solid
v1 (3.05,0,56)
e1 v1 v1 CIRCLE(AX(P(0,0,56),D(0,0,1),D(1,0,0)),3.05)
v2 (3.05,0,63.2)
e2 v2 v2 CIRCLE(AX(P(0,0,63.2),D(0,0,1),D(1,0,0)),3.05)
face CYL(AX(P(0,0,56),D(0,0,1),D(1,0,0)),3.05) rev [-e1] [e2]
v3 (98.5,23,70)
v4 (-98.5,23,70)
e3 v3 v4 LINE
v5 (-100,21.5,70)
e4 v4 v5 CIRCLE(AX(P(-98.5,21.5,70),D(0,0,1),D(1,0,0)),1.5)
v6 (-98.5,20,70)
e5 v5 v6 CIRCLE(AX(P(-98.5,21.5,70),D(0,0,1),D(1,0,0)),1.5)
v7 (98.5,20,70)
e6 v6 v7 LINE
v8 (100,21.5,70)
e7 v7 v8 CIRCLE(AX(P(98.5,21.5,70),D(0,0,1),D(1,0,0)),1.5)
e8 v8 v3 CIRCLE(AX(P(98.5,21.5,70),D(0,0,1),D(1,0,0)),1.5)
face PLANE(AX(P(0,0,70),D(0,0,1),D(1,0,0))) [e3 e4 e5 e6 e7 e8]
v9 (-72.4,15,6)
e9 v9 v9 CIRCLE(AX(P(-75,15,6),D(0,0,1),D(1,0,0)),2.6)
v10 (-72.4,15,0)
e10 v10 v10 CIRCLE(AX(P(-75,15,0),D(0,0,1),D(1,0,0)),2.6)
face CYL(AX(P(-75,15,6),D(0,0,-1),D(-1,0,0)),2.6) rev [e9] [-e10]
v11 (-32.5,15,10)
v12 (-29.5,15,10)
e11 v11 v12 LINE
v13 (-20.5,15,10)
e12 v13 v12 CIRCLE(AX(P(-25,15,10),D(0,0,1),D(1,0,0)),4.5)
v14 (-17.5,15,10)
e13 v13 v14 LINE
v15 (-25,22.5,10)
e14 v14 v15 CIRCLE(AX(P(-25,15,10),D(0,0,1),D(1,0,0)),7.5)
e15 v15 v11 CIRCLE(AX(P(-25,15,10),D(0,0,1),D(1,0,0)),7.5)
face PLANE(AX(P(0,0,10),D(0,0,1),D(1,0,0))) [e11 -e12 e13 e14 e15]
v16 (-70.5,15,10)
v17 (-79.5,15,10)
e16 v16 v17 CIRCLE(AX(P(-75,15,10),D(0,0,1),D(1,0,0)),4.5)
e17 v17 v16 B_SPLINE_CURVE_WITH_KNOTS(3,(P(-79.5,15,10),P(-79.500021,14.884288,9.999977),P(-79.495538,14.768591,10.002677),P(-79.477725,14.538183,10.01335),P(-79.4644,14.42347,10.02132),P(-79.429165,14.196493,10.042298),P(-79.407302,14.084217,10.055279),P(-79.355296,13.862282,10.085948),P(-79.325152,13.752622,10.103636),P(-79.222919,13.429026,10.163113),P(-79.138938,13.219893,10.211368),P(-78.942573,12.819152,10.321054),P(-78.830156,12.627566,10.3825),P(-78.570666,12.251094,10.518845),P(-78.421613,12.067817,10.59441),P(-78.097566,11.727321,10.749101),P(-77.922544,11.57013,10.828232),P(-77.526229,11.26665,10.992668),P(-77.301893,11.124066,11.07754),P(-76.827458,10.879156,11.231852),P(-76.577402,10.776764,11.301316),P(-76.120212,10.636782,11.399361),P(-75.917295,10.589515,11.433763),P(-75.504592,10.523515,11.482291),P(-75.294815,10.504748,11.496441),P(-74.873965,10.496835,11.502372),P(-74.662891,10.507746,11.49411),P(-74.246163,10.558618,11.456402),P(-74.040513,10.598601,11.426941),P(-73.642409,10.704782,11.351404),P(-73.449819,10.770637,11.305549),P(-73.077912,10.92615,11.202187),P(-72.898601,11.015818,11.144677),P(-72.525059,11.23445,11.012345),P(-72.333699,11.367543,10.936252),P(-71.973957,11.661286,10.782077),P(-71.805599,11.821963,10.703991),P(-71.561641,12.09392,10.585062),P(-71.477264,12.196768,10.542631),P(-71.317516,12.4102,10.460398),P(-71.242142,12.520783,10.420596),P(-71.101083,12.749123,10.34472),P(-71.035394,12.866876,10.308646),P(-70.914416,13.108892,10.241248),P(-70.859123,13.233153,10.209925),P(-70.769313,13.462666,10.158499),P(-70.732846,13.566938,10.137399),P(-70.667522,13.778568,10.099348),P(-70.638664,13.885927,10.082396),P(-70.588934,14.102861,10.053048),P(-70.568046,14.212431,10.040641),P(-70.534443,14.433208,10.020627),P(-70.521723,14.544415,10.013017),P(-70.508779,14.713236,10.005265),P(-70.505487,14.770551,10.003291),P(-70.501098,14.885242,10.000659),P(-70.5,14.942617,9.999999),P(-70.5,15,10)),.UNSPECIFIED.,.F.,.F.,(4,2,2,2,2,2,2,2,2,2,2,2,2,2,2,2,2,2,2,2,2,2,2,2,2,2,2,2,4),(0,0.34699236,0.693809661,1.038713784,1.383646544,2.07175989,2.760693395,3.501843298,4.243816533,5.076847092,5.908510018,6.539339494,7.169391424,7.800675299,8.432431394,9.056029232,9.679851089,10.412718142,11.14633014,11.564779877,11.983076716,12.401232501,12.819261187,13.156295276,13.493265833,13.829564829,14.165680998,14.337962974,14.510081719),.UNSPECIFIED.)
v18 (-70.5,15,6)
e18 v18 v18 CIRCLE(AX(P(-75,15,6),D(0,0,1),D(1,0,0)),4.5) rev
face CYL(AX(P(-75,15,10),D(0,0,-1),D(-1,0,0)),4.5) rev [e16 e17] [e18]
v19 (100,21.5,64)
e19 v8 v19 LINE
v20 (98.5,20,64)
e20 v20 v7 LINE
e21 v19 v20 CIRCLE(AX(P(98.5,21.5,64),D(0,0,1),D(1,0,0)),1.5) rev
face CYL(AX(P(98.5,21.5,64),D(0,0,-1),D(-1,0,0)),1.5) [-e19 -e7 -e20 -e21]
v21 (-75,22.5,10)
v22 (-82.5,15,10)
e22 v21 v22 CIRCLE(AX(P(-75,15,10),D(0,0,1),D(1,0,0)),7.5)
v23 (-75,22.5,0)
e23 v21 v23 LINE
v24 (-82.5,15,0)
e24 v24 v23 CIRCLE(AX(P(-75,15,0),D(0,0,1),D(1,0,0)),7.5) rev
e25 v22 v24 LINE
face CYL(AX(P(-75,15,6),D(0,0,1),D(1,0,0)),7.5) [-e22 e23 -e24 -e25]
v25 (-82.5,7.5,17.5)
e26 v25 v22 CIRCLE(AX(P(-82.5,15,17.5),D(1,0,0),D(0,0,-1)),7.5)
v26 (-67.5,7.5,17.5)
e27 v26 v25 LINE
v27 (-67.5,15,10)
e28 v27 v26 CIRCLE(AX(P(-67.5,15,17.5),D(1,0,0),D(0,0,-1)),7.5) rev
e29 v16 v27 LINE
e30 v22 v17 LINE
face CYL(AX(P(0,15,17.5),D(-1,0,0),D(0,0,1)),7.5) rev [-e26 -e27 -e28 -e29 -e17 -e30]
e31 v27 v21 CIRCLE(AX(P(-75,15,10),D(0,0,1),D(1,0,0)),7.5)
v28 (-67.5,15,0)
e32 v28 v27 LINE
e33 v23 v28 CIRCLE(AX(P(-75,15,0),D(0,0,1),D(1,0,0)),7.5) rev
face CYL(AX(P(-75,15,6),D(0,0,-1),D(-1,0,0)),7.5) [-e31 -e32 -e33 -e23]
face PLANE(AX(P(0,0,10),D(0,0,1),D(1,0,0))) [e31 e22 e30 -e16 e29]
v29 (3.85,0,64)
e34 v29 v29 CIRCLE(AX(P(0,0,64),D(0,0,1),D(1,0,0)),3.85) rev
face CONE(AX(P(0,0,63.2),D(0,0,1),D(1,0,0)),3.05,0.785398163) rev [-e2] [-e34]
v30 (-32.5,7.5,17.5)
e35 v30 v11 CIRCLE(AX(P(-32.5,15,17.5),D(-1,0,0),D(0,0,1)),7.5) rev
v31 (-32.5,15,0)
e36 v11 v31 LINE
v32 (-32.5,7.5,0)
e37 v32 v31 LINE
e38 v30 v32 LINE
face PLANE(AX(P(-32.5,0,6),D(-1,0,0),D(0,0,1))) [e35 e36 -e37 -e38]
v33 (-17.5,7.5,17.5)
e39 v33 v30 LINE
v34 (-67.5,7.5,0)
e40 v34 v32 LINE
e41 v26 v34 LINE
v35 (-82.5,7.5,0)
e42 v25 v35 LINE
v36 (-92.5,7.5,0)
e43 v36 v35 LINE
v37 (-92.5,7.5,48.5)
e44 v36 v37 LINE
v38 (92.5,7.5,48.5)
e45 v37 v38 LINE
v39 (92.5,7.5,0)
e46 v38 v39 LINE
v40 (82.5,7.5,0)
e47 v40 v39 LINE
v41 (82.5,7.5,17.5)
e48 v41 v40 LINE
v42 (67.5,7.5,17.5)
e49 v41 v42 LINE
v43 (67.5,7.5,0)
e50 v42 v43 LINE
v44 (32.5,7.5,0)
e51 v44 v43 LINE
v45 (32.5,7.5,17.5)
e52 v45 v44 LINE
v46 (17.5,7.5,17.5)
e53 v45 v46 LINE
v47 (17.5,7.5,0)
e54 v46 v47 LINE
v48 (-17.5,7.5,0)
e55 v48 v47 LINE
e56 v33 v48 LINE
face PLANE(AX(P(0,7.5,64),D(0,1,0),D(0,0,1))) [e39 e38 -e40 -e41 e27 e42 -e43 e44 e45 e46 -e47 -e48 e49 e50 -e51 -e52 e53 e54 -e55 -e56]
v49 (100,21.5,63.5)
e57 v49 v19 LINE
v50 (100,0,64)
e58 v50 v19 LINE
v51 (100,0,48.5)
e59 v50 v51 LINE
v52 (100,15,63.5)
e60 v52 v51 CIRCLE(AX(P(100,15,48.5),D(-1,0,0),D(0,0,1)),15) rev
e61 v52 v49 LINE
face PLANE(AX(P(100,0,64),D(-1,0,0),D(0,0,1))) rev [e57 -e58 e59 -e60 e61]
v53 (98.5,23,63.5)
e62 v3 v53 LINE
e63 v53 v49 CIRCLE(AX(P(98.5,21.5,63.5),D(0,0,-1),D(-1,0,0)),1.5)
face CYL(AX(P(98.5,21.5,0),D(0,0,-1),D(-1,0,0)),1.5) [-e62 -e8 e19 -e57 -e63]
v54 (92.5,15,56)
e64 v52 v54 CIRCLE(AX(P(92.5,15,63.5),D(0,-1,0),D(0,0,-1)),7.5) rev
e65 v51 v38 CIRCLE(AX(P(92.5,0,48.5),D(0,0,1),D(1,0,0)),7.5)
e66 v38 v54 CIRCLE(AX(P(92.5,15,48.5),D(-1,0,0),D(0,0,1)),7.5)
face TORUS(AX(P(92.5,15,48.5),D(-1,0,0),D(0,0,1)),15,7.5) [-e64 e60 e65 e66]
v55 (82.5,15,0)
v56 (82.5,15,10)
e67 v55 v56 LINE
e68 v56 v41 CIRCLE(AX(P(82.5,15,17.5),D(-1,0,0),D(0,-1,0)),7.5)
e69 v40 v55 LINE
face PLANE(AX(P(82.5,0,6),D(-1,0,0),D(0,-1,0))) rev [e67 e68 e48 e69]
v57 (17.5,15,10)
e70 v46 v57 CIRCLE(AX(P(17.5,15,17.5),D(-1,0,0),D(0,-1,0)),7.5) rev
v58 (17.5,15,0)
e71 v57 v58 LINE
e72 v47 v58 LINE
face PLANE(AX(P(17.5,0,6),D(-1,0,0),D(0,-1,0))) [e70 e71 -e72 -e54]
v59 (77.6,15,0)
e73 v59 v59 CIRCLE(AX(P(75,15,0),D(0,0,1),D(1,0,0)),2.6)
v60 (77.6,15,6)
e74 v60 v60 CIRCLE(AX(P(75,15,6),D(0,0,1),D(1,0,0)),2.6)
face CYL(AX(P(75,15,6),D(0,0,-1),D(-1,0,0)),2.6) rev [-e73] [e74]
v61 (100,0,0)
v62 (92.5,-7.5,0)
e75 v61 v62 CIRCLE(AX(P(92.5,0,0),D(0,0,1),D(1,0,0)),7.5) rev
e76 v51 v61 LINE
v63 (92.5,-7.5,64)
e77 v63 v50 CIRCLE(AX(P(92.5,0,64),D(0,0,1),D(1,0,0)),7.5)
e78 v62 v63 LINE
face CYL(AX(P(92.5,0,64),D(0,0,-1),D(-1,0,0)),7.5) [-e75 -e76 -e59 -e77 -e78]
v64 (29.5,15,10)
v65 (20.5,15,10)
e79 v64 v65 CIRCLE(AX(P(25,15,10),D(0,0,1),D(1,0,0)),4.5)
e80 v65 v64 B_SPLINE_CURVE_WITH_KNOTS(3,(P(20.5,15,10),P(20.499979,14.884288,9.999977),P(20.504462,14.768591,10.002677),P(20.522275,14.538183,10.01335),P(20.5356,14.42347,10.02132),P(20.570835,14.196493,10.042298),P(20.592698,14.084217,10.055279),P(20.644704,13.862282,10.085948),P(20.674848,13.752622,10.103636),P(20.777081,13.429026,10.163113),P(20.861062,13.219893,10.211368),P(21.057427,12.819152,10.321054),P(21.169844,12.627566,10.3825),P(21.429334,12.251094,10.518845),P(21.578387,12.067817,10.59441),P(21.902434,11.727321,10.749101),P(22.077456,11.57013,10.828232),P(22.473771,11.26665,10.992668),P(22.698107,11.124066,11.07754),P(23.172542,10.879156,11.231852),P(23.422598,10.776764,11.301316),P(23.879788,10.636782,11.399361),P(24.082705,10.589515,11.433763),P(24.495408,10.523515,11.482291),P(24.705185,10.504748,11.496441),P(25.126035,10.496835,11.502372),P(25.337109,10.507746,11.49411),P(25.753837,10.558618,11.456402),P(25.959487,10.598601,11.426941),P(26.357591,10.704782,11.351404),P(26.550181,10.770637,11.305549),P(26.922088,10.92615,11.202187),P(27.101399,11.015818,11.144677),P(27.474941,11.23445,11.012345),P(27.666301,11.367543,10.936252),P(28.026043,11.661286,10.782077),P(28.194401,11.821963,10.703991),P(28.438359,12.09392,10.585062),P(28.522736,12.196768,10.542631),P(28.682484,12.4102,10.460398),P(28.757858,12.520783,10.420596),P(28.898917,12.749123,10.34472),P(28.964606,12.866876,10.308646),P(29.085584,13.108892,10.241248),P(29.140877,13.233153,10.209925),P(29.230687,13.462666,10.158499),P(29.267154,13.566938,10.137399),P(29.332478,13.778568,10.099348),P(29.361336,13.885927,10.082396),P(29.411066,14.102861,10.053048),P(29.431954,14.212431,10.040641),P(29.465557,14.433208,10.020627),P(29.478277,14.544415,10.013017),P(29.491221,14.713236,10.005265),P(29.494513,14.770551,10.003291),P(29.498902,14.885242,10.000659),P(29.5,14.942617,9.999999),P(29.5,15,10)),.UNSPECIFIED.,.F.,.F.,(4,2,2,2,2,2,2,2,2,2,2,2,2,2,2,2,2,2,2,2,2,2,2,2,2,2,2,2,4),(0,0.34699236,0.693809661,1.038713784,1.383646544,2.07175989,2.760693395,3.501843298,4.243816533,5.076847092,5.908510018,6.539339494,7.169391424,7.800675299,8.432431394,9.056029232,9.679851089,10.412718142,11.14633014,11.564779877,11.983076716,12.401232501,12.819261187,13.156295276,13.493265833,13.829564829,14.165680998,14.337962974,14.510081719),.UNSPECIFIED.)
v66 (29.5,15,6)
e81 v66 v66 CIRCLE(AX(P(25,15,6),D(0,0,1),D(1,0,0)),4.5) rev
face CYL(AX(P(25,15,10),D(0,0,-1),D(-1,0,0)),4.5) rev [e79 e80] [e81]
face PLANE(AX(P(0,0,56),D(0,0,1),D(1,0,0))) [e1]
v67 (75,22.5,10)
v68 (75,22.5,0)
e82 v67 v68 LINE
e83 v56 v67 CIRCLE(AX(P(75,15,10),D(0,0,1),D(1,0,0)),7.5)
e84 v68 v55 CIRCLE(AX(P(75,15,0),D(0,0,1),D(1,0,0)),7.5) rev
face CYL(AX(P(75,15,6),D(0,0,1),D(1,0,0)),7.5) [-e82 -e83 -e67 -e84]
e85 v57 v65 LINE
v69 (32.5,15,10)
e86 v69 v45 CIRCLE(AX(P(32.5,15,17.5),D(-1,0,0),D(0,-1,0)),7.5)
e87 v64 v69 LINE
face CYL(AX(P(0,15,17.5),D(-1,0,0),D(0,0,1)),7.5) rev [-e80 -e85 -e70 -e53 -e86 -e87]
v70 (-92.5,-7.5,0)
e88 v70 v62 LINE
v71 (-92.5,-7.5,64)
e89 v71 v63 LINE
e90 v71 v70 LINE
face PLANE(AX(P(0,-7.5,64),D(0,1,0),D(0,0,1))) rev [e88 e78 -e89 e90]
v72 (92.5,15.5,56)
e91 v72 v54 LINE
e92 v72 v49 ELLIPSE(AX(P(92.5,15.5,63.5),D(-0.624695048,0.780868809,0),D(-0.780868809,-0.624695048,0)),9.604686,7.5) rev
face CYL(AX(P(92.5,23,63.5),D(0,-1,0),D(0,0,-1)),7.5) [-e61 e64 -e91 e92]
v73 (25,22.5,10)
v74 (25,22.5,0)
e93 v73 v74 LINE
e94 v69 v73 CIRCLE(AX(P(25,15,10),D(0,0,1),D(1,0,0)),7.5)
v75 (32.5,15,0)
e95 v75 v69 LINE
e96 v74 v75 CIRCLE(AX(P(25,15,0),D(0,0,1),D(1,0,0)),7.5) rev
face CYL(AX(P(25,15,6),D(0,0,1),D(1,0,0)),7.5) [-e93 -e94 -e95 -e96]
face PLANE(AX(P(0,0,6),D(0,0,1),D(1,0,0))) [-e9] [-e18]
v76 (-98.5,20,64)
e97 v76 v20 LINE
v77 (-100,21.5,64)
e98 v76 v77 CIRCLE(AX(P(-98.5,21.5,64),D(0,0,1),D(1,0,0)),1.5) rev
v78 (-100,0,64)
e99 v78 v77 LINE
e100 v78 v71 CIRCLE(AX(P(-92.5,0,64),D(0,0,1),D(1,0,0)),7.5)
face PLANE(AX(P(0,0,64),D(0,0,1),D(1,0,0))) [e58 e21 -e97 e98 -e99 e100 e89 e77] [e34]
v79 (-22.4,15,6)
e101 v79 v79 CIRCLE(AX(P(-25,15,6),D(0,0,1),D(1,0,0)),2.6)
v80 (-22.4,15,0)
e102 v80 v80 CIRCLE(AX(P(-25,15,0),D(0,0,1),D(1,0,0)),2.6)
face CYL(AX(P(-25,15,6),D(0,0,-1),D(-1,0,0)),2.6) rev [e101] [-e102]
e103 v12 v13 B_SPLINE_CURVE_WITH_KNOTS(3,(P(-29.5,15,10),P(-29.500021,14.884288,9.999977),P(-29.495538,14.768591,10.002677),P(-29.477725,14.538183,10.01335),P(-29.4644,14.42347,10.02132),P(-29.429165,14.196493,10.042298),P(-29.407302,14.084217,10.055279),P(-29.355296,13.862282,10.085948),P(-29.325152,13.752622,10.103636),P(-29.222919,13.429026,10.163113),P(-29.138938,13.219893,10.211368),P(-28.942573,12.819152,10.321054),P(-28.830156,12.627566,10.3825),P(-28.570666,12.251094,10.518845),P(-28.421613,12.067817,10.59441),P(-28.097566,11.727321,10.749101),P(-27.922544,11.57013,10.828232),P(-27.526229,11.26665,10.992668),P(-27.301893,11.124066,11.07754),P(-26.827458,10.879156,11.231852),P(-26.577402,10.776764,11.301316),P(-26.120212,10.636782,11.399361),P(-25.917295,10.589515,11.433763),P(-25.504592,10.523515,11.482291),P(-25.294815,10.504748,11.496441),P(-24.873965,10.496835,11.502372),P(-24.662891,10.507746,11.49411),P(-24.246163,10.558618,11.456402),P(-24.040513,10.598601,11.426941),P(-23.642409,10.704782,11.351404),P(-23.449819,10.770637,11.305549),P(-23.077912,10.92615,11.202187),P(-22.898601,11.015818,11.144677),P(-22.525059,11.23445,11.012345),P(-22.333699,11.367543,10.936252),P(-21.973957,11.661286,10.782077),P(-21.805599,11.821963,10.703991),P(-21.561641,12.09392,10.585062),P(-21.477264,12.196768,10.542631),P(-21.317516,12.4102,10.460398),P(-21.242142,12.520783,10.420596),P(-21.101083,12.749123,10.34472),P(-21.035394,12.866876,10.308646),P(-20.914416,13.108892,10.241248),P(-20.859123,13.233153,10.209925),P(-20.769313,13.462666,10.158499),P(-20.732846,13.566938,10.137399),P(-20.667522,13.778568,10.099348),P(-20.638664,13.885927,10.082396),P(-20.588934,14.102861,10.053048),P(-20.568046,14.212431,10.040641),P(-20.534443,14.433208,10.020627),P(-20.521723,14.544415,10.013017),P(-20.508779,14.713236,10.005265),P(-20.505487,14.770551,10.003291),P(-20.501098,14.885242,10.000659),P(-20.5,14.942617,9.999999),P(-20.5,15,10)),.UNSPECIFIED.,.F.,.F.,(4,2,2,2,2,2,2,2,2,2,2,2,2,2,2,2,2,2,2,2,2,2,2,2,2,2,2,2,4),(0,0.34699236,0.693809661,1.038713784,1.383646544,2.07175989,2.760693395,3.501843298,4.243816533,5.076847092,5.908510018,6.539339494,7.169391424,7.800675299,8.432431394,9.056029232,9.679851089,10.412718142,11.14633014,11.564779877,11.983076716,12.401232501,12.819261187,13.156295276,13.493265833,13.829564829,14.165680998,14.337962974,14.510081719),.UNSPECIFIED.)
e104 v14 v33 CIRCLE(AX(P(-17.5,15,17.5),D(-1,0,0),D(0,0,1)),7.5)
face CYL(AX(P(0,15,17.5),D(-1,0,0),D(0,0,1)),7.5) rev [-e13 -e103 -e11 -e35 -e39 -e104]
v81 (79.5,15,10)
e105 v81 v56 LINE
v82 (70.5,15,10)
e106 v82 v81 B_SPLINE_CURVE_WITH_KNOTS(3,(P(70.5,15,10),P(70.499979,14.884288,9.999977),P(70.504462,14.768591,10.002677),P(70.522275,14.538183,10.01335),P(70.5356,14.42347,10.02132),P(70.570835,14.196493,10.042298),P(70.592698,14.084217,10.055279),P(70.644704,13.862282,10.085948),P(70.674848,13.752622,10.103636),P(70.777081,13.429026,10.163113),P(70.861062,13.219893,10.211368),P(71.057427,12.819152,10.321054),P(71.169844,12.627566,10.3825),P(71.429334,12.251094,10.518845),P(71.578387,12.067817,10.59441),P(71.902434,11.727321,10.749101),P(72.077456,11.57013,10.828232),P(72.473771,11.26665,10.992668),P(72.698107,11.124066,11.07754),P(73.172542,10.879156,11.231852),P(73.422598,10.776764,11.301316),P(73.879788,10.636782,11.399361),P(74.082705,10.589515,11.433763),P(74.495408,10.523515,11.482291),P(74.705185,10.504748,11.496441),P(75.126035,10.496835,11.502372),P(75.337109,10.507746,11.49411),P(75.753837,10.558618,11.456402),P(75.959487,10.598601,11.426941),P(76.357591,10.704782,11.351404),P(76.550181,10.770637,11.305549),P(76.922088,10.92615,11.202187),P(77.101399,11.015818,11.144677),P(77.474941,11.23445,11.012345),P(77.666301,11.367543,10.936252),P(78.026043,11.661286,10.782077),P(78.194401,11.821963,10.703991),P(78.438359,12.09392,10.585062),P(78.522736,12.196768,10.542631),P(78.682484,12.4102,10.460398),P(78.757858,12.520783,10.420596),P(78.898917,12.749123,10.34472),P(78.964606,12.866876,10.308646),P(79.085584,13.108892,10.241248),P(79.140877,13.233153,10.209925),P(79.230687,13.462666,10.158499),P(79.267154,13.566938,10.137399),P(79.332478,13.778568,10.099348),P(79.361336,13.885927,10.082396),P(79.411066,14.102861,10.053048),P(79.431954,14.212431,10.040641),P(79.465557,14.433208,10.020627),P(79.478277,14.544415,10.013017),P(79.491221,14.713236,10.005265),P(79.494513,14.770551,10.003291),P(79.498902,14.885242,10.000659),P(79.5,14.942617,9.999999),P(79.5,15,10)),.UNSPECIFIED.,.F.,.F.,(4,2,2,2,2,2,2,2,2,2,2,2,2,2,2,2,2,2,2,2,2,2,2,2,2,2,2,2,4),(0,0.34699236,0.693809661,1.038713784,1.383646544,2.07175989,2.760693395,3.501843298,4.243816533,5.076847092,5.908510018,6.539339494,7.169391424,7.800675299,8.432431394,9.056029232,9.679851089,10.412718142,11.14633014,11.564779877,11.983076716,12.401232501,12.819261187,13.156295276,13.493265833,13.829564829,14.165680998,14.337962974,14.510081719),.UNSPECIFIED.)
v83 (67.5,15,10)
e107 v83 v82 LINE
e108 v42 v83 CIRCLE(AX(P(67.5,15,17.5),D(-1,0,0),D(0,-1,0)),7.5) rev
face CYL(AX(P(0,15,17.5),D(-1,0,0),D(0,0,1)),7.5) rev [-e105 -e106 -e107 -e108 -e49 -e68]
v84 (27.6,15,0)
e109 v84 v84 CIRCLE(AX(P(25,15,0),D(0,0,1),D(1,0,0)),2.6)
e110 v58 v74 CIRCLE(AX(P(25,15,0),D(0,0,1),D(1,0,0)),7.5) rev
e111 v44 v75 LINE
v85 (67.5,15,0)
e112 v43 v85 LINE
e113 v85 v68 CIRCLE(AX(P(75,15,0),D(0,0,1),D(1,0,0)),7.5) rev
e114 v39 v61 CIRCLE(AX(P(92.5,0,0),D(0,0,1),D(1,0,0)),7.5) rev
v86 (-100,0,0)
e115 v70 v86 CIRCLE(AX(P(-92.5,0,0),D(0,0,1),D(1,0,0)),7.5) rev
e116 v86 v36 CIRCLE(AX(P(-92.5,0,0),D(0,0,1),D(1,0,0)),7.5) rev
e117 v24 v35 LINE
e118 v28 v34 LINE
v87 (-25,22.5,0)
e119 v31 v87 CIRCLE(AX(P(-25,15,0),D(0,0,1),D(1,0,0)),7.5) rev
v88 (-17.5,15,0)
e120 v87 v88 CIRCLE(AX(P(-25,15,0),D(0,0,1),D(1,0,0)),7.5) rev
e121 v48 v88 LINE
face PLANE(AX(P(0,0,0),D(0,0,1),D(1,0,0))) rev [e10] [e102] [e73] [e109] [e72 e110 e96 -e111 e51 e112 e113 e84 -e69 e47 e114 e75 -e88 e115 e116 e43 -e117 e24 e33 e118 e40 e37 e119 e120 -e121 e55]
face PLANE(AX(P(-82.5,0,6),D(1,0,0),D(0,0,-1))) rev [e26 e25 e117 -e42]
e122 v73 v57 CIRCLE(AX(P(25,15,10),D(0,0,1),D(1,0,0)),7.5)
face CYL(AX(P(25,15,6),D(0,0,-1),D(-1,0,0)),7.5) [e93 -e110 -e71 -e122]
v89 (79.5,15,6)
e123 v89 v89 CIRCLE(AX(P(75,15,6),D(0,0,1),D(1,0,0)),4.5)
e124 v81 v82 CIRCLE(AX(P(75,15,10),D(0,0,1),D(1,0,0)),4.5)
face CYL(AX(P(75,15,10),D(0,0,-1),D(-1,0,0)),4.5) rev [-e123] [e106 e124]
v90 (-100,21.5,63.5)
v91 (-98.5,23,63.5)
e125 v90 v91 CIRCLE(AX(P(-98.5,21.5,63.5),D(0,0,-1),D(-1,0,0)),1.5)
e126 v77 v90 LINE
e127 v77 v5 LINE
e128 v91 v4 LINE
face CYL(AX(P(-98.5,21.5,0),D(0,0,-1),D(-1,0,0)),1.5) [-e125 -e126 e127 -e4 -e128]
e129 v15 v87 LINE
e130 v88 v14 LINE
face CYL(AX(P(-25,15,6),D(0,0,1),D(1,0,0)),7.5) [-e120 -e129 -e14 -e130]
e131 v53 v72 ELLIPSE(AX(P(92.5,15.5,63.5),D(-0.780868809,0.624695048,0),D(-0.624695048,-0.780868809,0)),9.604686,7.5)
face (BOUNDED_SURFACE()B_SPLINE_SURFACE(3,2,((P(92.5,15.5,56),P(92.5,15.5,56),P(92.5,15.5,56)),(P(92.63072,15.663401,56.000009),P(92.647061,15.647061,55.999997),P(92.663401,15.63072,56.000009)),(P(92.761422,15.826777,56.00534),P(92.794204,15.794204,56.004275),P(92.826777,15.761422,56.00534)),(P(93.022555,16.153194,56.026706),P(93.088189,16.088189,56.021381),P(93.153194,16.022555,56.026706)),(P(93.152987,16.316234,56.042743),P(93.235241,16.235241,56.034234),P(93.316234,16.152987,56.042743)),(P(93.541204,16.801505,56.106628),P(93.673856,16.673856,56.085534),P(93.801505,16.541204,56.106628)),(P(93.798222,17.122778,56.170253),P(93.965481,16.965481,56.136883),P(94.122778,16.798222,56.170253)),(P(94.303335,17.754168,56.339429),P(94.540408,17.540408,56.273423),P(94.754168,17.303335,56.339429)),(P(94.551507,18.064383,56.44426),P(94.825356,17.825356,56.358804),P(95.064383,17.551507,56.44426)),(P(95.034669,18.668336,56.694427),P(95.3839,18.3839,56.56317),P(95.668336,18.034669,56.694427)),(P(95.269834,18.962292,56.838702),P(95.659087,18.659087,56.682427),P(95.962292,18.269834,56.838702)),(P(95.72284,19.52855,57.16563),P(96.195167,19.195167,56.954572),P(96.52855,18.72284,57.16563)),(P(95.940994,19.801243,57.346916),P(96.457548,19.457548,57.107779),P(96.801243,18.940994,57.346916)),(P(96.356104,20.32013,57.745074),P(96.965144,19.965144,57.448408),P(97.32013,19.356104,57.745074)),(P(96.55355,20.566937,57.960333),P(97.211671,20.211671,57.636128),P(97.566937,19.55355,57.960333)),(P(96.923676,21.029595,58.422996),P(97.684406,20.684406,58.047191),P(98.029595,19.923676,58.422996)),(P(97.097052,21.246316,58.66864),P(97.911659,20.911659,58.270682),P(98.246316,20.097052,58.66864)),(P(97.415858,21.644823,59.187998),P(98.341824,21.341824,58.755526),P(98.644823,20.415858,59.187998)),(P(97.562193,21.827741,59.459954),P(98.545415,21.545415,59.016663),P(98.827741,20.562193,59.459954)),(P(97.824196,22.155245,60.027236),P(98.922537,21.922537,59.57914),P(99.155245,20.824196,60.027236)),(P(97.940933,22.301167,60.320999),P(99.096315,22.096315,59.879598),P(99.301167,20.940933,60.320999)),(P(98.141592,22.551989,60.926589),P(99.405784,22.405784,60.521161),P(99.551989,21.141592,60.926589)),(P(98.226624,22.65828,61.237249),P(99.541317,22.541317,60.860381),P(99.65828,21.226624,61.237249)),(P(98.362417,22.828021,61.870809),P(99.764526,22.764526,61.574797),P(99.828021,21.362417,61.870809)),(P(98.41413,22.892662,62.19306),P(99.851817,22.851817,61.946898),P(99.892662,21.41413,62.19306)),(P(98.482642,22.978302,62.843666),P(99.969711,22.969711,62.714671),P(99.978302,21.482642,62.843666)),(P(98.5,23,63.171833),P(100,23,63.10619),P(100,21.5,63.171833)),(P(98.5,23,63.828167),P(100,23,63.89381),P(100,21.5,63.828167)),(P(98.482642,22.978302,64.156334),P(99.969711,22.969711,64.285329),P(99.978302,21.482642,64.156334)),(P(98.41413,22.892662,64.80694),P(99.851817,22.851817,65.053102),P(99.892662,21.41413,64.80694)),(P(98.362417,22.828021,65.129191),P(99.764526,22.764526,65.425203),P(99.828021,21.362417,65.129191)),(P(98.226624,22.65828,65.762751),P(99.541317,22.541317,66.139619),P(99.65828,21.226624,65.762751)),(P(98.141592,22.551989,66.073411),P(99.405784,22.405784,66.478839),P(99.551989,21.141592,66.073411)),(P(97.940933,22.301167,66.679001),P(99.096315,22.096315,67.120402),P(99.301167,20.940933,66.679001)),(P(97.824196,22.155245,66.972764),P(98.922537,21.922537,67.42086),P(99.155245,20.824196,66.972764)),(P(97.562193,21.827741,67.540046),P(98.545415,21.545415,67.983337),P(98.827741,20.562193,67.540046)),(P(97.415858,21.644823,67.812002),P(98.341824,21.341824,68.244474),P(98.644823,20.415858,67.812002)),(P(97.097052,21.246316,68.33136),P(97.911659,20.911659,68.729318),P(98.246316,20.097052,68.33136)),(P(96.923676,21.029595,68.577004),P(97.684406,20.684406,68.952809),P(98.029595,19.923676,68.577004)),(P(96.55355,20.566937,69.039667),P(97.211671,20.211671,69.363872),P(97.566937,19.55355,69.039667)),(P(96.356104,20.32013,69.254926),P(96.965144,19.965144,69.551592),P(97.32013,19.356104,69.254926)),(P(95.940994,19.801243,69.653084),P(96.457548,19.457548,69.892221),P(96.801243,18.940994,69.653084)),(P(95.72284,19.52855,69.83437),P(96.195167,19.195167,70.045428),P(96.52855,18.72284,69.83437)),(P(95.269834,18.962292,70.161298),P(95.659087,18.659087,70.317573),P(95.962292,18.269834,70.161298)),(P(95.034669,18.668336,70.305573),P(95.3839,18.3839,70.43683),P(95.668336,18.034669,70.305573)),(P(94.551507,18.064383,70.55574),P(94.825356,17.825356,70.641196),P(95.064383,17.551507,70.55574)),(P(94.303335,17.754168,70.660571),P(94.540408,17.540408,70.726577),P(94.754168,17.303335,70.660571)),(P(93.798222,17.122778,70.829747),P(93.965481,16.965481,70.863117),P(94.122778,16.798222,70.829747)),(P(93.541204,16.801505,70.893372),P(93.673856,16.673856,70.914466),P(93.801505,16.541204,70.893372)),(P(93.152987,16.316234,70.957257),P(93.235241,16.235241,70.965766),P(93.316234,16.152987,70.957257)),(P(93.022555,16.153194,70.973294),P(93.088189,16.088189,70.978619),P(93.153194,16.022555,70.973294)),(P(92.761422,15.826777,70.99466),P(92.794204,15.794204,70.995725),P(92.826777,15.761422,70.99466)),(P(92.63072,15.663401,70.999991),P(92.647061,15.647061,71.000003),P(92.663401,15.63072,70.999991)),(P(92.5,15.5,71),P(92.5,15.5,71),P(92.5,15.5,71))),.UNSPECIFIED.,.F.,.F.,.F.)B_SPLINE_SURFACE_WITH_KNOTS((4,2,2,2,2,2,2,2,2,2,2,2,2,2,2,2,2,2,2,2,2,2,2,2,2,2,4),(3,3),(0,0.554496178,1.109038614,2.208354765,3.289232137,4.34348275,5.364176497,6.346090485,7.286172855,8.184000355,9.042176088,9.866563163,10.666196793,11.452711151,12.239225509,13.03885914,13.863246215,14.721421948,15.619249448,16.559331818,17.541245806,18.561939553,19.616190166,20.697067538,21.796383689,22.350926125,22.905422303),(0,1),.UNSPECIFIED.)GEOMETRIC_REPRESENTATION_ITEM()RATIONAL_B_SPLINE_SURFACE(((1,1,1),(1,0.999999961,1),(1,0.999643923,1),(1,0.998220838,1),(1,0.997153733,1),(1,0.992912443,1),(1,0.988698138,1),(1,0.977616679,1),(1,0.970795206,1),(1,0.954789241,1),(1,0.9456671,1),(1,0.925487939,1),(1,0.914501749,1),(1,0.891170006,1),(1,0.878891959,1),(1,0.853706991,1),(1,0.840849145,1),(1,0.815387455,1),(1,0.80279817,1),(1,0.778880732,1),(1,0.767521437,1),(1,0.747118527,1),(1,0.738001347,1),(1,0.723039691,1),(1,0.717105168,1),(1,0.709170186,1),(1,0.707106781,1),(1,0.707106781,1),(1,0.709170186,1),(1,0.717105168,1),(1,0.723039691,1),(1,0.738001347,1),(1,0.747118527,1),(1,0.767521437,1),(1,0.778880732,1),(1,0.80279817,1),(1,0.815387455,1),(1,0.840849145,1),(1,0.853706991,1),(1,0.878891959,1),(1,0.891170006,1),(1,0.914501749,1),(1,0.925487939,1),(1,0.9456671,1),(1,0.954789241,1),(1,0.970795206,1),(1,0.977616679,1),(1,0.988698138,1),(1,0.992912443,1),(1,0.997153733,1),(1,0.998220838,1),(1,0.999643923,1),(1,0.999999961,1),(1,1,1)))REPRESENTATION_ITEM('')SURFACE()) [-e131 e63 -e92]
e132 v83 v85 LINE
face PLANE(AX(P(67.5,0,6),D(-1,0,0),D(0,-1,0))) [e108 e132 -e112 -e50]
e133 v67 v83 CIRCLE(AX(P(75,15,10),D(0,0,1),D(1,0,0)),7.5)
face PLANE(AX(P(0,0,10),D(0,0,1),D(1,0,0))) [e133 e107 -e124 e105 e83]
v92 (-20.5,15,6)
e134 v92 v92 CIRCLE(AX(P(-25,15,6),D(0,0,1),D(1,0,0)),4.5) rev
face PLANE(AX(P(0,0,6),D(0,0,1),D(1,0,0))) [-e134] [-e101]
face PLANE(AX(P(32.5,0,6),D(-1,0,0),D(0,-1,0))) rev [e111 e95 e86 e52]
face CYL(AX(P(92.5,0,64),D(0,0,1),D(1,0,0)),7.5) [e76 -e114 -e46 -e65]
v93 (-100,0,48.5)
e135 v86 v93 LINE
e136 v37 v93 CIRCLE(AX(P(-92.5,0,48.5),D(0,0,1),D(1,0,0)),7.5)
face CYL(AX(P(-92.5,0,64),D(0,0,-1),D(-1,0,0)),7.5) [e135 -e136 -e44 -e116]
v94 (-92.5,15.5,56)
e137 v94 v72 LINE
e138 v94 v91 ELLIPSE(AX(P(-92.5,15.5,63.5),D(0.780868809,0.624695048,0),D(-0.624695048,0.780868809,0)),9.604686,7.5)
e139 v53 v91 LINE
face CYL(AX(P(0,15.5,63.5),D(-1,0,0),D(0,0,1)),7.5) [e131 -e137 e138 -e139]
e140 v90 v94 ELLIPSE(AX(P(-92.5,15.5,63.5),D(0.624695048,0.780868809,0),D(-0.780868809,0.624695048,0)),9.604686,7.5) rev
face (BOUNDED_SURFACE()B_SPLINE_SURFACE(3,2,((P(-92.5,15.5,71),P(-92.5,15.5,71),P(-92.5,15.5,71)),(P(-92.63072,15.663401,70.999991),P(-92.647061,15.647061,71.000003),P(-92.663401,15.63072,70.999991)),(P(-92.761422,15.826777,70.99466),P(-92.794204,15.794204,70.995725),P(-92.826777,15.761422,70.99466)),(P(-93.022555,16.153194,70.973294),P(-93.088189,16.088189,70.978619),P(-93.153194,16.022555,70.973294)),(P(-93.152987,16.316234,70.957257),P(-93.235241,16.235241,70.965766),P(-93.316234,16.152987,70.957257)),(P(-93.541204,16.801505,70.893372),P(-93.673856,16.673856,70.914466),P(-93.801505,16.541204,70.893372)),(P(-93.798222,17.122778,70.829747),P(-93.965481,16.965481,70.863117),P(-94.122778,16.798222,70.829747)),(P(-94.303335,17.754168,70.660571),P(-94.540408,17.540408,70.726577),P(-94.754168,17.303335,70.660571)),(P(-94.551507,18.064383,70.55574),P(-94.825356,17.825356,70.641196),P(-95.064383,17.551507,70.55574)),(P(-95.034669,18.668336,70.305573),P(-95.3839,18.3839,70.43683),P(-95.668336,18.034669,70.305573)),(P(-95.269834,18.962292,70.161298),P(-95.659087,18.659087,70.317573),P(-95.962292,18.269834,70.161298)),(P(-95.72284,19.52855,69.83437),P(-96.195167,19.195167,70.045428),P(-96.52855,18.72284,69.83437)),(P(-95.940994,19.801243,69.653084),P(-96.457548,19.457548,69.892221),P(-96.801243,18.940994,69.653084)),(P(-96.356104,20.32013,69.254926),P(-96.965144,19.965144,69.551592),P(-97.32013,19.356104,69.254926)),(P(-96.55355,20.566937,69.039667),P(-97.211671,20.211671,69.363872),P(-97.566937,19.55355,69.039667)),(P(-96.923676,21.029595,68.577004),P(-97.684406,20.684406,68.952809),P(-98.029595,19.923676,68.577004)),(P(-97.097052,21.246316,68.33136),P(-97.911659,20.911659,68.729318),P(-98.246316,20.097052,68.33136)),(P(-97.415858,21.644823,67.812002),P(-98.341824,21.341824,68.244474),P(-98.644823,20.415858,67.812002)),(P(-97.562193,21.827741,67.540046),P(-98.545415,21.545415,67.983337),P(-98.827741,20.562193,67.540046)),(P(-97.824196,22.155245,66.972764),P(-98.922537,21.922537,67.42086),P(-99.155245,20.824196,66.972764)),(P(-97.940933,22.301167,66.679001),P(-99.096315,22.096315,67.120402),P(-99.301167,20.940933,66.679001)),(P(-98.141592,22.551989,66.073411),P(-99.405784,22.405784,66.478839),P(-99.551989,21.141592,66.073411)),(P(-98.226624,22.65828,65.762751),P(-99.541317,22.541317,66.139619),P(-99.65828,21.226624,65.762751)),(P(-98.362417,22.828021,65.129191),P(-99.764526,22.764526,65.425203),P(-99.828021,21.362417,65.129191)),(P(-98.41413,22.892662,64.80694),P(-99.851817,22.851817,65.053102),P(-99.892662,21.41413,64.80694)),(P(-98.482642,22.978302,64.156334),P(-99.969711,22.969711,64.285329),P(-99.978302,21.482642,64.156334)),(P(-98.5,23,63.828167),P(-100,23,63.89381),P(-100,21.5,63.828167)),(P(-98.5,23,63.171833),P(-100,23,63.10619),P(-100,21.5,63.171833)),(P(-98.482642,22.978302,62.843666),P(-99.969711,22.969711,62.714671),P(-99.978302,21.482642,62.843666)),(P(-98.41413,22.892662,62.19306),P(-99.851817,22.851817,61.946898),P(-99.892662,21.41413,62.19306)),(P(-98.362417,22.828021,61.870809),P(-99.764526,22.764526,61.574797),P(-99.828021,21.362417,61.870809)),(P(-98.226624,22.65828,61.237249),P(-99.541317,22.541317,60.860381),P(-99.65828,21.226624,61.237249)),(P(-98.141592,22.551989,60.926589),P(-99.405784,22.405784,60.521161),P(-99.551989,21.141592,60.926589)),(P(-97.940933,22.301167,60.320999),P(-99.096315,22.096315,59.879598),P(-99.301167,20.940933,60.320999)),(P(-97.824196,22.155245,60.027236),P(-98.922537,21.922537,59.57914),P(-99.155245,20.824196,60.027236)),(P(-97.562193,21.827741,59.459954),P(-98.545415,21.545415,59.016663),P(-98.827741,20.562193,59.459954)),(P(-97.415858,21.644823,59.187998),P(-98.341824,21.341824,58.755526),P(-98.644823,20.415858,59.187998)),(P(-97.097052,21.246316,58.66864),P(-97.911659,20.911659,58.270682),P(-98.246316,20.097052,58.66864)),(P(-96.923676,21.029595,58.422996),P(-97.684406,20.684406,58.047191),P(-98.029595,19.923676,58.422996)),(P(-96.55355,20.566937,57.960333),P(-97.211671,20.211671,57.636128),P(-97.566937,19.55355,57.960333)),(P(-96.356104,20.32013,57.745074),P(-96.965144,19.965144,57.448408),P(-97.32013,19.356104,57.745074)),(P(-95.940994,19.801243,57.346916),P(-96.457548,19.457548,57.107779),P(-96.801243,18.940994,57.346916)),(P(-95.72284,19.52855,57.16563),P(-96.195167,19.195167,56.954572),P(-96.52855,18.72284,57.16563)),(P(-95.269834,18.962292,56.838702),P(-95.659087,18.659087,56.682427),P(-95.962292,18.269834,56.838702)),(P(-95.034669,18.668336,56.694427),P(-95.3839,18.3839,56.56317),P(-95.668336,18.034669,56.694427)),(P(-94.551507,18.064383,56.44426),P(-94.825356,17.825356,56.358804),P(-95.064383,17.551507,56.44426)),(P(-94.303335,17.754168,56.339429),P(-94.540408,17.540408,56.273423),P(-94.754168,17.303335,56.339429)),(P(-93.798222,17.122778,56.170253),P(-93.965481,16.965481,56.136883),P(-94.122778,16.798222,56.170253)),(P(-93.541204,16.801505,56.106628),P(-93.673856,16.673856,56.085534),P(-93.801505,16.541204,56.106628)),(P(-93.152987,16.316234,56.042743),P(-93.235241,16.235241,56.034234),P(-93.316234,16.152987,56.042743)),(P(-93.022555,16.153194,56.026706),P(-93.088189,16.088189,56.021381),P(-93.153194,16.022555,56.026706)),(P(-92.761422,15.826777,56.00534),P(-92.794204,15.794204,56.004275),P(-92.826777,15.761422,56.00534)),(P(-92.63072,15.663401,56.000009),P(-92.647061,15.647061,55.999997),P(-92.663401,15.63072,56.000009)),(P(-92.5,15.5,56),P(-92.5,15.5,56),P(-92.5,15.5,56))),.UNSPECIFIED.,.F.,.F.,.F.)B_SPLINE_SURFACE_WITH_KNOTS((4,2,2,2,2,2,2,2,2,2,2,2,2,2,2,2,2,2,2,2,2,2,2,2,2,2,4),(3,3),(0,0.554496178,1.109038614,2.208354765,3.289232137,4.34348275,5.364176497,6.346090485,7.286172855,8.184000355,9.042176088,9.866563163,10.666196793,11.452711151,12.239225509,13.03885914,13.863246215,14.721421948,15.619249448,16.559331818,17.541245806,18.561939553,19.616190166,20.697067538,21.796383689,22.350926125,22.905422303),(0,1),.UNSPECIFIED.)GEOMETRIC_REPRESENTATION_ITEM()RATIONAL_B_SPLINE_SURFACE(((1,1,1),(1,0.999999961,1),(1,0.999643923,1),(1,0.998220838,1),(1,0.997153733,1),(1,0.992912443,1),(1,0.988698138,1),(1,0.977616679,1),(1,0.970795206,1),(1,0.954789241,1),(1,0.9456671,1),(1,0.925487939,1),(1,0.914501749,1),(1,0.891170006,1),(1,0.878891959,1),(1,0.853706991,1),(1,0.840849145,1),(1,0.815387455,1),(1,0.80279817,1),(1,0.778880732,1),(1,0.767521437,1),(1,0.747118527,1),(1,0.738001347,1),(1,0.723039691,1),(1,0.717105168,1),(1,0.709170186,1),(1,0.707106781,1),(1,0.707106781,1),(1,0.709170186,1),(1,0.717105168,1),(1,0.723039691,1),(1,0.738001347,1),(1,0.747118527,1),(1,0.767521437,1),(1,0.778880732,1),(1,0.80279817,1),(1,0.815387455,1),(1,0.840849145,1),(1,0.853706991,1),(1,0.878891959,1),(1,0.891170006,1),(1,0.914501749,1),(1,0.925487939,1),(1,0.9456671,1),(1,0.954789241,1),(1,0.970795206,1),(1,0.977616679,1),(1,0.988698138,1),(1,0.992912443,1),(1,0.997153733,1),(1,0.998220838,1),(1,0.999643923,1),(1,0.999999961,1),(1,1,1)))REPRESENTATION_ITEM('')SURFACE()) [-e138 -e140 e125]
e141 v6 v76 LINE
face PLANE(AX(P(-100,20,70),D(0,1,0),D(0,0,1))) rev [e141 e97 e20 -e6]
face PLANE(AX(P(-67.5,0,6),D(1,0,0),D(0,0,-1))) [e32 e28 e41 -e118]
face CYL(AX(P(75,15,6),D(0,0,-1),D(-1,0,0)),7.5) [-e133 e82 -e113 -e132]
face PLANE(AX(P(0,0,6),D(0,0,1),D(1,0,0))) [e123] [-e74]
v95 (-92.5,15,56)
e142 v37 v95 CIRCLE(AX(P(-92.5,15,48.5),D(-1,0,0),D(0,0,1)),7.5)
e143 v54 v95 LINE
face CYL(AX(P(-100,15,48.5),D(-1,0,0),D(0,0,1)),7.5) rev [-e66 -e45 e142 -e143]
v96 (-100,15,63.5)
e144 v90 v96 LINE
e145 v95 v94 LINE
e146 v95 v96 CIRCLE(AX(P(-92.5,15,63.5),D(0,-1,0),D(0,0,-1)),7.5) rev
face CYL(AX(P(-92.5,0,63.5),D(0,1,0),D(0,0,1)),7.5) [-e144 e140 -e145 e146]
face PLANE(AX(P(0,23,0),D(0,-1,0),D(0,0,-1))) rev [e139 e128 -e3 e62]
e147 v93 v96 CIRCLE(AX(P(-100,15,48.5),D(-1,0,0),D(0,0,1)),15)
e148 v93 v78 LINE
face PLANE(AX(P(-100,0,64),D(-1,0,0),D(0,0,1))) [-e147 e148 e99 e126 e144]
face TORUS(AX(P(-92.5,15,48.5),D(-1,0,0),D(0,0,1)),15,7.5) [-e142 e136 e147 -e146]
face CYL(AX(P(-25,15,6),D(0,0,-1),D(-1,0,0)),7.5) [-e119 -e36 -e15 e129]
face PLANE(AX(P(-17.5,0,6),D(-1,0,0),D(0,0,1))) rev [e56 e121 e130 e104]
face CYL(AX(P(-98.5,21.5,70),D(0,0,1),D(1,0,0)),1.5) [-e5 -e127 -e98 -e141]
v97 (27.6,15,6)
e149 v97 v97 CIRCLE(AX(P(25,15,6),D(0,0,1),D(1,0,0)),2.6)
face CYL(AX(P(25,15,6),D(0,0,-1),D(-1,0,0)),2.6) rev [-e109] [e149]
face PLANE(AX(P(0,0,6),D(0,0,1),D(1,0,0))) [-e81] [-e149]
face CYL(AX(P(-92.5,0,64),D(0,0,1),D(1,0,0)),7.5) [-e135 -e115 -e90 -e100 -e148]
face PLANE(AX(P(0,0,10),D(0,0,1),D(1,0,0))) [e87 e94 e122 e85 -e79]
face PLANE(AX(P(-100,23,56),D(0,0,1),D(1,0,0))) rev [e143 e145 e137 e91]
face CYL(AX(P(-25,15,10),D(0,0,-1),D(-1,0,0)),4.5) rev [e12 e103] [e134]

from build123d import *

# Parameters (mm, degrees)
SKETCH1_W             = 15
SKETCH1_H             = 15
SKETCH1_R             = 2.6
BOSS_EXTRUDE1_DEPTH   = 6
BOSS_EXTRUDE1_2_DEPTH = 6
BOSS_EXTRUDE1_3_DEPTH = 6
BOSS_EXTRUDE1_4_DEPTH = 6
BOSS_EXTRUDE2_DEPTH   = 64
SKETCH2_R             = 3.05
CUT_EXTRUDE1_DEPTH    = 8
SKETCH3_W             = 15
SKETCH3_H             = 15
SKETCH3_R             = 4.5
BOSS_EXTRUDE3_DEPTH   = 4
CHAMFER1_SIZE         = 0.8
SKETCH4_W             = 200
SKETCH4_H             = 8
BOSS_EXTRUDE4_DEPTH   = 15.5
SKETCH5_W             = 200
SKETCH5_H             = 3
BOSS_EXTRUDE5_DEPTH   = 6
FILLET3_R             = 7.5
FILLET4_R             = 1.5


# Some blends are built 0.0001 mm under size
with BuildPart() as part:
    # Sketch1 → Boss-Extrude1 (new body)
    with BuildSketch(Plane.XY):
        with Locations((-25, 15)):
            Rectangle(SKETCH1_W, SKETCH1_H)
        with Locations((-25, 15)):
            Circle(SKETCH1_R, mode=Mode.SUBTRACT)
    extrude(amount=BOSS_EXTRUDE1_DEPTH)



with BuildPart() as body_2:
    # Sketch1 → Boss-Extrude1 2 (new body)
    with BuildSketch(Plane.XY):
        with Locations((25, 15)):
            Rectangle(SKETCH1_W, SKETCH1_H)
        with Locations((25, 15)):
            Circle(SKETCH1_R, mode=Mode.SUBTRACT)
    extrude(amount=BOSS_EXTRUDE1_2_DEPTH)


with BuildPart() as body_3:
    # Sketch1 → Boss-Extrude1 3 (new body)
    with BuildSketch(Plane.XY):
        with Locations((-75, 15)):
            Rectangle(SKETCH1_W, SKETCH1_H)
        with Locations((-75, 15)):
            Circle(SKETCH1_R, mode=Mode.SUBTRACT)
    extrude(amount=BOSS_EXTRUDE1_3_DEPTH)


with BuildPart() as body_4:
    # Sketch1 → Boss-Extrude1 4 (new body)
    with BuildSketch(Plane.XY):
        with Locations((75, 15)):
            Rectangle(SKETCH1_W, SKETCH1_H)
        with Locations((75, 15)):
            Circle(SKETCH1_R, mode=Mode.SUBTRACT)
    extrude(amount=BOSS_EXTRUDE1_4_DEPTH)


with BuildPart() as part_1:
    add(part.part)

    add(body_2.part)  # Boss-Extrude2 merges body 2

    add(body_3.part)  # Boss-Extrude2 merges body 3
    # Sketch1<4> → Boss-Extrude2 (add)
    with BuildSketch(Plane.XY):
        Polygon((-100, 7.5), (-100, -7.5), (100, -7.5), (100, 7.5), (82.5, 7.5), (67.5, 7.5), (32.5, 7.5), (17.5, 7.5), (-17.5, 7.5), (-32.5, 7.5), (-67.5, 7.5), (-82.5, 7.5), align=None)
    extrude(amount=BOSS_EXTRUDE2_DEPTH)

    # Sketch2 → Cut-Extrude1 (cut)
    with BuildSketch(Plane.XY.offset(64)):
        Circle(SKETCH2_R)
    extrude(amount=-CUT_EXTRUDE1_DEPTH, mode=Mode.SUBTRACT)


    add(body_4.part)  # Boss-Extrude3 merges body 4
    # Sketch3 → Boss-Extrude3 (add)
    # profile 1 of 4: a face of its own
    with BuildSketch(Plane.XY.offset(6)):
        with Locations((75, 15)):
            Rectangle(SKETCH3_W, SKETCH3_H)
        with Locations((75, 15)):
            Circle(SKETCH3_R, mode=Mode.SUBTRACT)
    # profile 2 of 4: a face of its own
    with BuildSketch(Plane.XY.offset(6)):
        with Locations((25, 15)):
            Rectangle(SKETCH3_W, SKETCH3_H)
        with Locations((25, 15)):
            Circle(SKETCH3_R, mode=Mode.SUBTRACT)
    # profile 3 of 4: a face of its own
    with BuildSketch(Plane.XY.offset(6)):
        with Locations((-25, 15)):
            Rectangle(SKETCH3_W, SKETCH3_H)
        with Locations((-25, 15)):
            Circle(SKETCH3_R, mode=Mode.SUBTRACT)
    # profile 4 of 4: a face of its own
    with BuildSketch(Plane.XY.offset(6)):
        with Locations((-75, 15)):
            Rectangle(SKETCH3_W, SKETCH3_H)
        with Locations((-75, 15)):
            Circle(SKETCH3_R, mode=Mode.SUBTRACT)
    extrude(amount=BOSS_EXTRUDE3_DEPTH)

    # Chamfer1
    chamfer1_edges = [part_1.edges().sort_by_distance(p)[0] for p in [
        (-3.05, 0, 64),
    ]]
    chamfer(chamfer1_edges, length=CHAMFER1_SIZE)

    # Sketch4 → Boss-Extrude4 (add)
    with BuildSketch(Plane(origin=(0, 7.5, 0), x_dir=(1, 0, 0), z_dir=(0, 1, 0))):
        with Locations((0, -60)):
            Rectangle(SKETCH4_W, SKETCH4_H)
    extrude(amount=BOSS_EXTRUDE4_DEPTH)

    # Sketch5 → Boss-Extrude5 (add)
    with BuildSketch(Plane.XY.offset(64)):
        with Locations((0, 21.5)):
            Rectangle(SKETCH5_W, SKETCH5_H)
    extrude(amount=BOSS_EXTRUDE5_DEPTH)

    # Fillet3
    # the kernel refuses this fillet: 7.5 mm, written as the material it adds along each edge
    with BuildSketch(Plane(origin=(-82.5, 7.5, 10), x_dir=(0, 1, 0), z_dir=(1, 0, 0))) as fillet3_piece_1_section:
        with BuildLine():
            CenterArc((FILLET3_R, FILLET3_R), FILLET3_R, 180, 90)
            Line((0, FILLET3_R), (0, 0))
            Line((0, 0), (FILLET3_R, 0))
        make_face()
    fillet3_piece_1 = extrude(amount=15, mode=Mode.PRIVATE)
    fillet3_piece_1 = fillet3_piece_1 - Plane(origin=(-75, 15, 10), x_dir=(1, 0, 0), z_dir=(0, 0, -1)) * Cylinder(4.5, 60, mode=Mode.PRIVATE)
    add(fillet3_piece_1)
    with BuildSketch(Plane(origin=(-32.5, 7.5, 10), x_dir=(0, 1, 0), z_dir=(1, 0, 0))) as fillet3_piece_2_section:
        with BuildLine():
            CenterArc((FILLET3_R, FILLET3_R), FILLET3_R, 180, 90)
            Line((0, FILLET3_R), (0, 0))
            Line((0, 0), (FILLET3_R, 0))
        make_face()
    fillet3_piece_2 = extrude(amount=15, mode=Mode.PRIVATE)
    fillet3_piece_2 = fillet3_piece_2 - Plane(origin=(-25, 15, 10), x_dir=(1, 0, 0), z_dir=(0, 0, -1)) * Cylinder(4.5, 61, mode=Mode.PRIVATE)
    add(fillet3_piece_2)
    with BuildSketch(Plane(origin=(17.5, 7.5, 10), x_dir=(0, 1, 0), z_dir=(1, 0, 0))) as fillet3_piece_3_section:
        with BuildLine():
            CenterArc((FILLET3_R, FILLET3_R), FILLET3_R, 180, 90)
            Line((0, FILLET3_R), (0, 0))
            Line((0, 0), (FILLET3_R, 0))
        make_face()
    fillet3_piece_3 = extrude(amount=15, mode=Mode.PRIVATE)
    fillet3_piece_3 = fillet3_piece_3 - Plane(origin=(25, 15, 10), x_dir=(1, 0, 0), z_dir=(0, 0, -1)) * Cylinder(4.5, 61, mode=Mode.PRIVATE)
    add(fillet3_piece_3)
    with BuildSketch(Plane(origin=(67.5, 7.5, 10), x_dir=(0, 1, 0), z_dir=(1, 0, 0))) as fillet3_piece_4_section:
        with BuildLine():
            CenterArc((FILLET3_R, FILLET3_R), FILLET3_R, 180, 90)
            Line((0, FILLET3_R), (0, 0))
            Line((0, 0), (FILLET3_R, 0))
        make_face()
    fillet3_piece_4 = extrude(amount=15, mode=Mode.PRIVATE)
    fillet3_piece_4 = fillet3_piece_4 - Plane(origin=(75, 15, 10), x_dir=(1, 0, 0), z_dir=(0, 0, -1)) * Cylinder(4.5, 60, mode=Mode.PRIVATE)
    add(fillet3_piece_4)
    with BuildSketch(Plane(origin=(100, 7.5, 56), x_dir=(0, 0, -1), z_dir=(-1, 0, 0))) as fillet3_piece_5:
        with BuildLine():
            CenterArc((FILLET3_R, -FILLET3_R), FILLET3_R, 90, 90)
            Line((0, -FILLET3_R), (0, 0))
            Line((0, 0), (FILLET3_R, 0))
        make_face()
    extrude(amount=200)
    # the kernel refuses this fillet: 7.5 mm, written as the material it takes off along each edge
    with BuildSketch(Plane(origin=(100, -7.5, -18.75), x_dir=(-1, 0, 0), z_dir=(0, 0, 1))) as fillet3_2_piece_1:
        with BuildLine():
            CenterArc((FILLET3_R, -FILLET3_R), FILLET3_R, 90, 90)
            Line((0, -FILLET3_R), (0, 0))
            Line((0, 0), (FILLET3_R, 0))
        make_face()
    extrude(amount=101.5, mode=Mode.SUBTRACT)
    with BuildSketch(Plane(origin=(-100, -7.5, -18.75), x_dir=(1, 0, 0), z_dir=(0, 0, 1))) as fillet3_2_piece_2:
        with BuildLine():
            CenterArc((FILLET3_R, FILLET3_R), FILLET3_R, 180, 90)
            Line((0, FILLET3_R), (0, 0))
            Line((0, 0), (FILLET3_R, 0))
        make_face()
    extrude(amount=101.5, mode=Mode.SUBTRACT)
    with BuildSketch(Plane(origin=(67.5, 22.5, 28.75), x_dir=(0, -1, 0), z_dir=(0, 0, -1)), Plane(origin=(-82.5, 22.5, 28.75), x_dir=(0, -1, 0), z_dir=(0, 0, -1)), Plane(origin=(17.5, 22.5, 28.75), x_dir=(0, -1, 0), z_dir=(0, 0, -1)), Plane(origin=(-32.5, 22.5, 28.75), x_dir=(0, -1, 0), z_dir=(0, 0, -1))) as fillet3_2_piece_3:
        with BuildLine():
            CenterArc((FILLET3_R, -FILLET3_R), FILLET3_R, 90, 90)
            Line((0, -FILLET3_R), (0, 0))
            Line((0, 0), (FILLET3_R, 0))
        make_face()
    extrude(amount=47.5, mode=Mode.SUBTRACT)
    with BuildSketch(Plane(origin=(-67.5, 22.5, -18.75), x_dir=(-1, 0, 0), z_dir=(0, 0, 1)), Plane(origin=(-17.5, 22.5, -18.75), x_dir=(-1, 0, 0), z_dir=(0, 0, 1)), Plane(origin=(32.5, 22.5, -18.75), x_dir=(-1, 0, 0), z_dir=(0, 0, 1)), Plane(origin=(82.5, 22.5, -18.75), x_dir=(-1, 0, 0), z_dir=(0, 0, 1))) as fillet3_2_piece_4:
        with BuildLine():
            CenterArc((FILLET3_R, FILLET3_R), FILLET3_R, 180, 90)
            Line((0, FILLET3_R), (0, 0))
            Line((0, 0), (FILLET3_R, 0))
        make_face()
    extrude(amount=47.5, mode=Mode.SUBTRACT)
    with BuildSketch(Plane(origin=(118.75, 23, 56), x_dir=(0, -1, 0), z_dir=(-1, 0, 0))) as fillet3_2_piece_5:
        with BuildLine():
            CenterArc((FILLET3_R, FILLET3_R), FILLET3_R, 180, 90)
            Line((0, FILLET3_R), (0, 0))
            Line((0, 0), (FILLET3_R, 0))
        make_face()
    extrude(amount=237.5, mode=Mode.SUBTRACT)
    # the kernel refuses this fillet: 7.5 mm, written as the material it takes off along each edge
    with BuildSketch(Plane(origin=(-100, 7.5, -18.75), x_dir=(0, -1, 0), z_dir=(0, 0, 1)), Plane(origin=(100, 7.5, -18.75), x_dir=(-1, 0, 0), z_dir=(0, 0, 1))) as fillet3_3_piece_1:
        with BuildLine():
            CenterArc((FILLET3_R, FILLET3_R), FILLET3_R, 180, 90)
            Line((0, FILLET3_R), (0, 0))
            Line((0, 0), (FILLET3_R, 0))
        make_face()
    extrude(amount=67.25, mode=Mode.SUBTRACT)
    with BuildSketch(Plane(origin=(100, 15, 56), x_dir=(-1, 0, 0), z_dir=(0, 1, 0)), Plane(origin=(-100, 15, 56), x_dir=(0, 0, 1), z_dir=(0, 1, 0))) as fillet3_3_piece_2:
        with BuildLine():
            CenterArc((FILLET3_R, FILLET3_R), FILLET3_R, 180, 90)
            Line((0, FILLET3_R), (0, 0))
            Line((0, 0), (FILLET3_R, 0))
        make_face()
    extrude(amount=19.25, mode=Mode.SUBTRACT)
    with BuildSketch(Plane(origin=(-100, 15, 48.5), x_dir=(0, -1, 0), z_dir=(0, 0, -1))) as fillet3_3_piece_3:
        with BuildLine():
            CenterArc((7.5 + FILLET3_R, -FILLET3_R), FILLET3_R, 90, 90)
            Line((7.5, -FILLET3_R), (7.5, 0))
            Line((7.5, 0), (7.5 + FILLET3_R, 0))
        make_face()
    revolve(axis=Axis((-100, 15, 48.5), (-1, 0, 0)), revolution_arc=90, mode=Mode.SUBTRACT)
    with BuildSketch(Plane(origin=(100, 15, 48.5), x_dir=(0, -1, 0), z_dir=(0, 0, -1))) as fillet3_3_piece_4:
        with BuildLine():
            CenterArc((7.5 + FILLET3_R, FILLET3_R), FILLET3_R, 180, 90)
            Line((7.5 + FILLET3_R, 0), (7.5, 0))
            Line((7.5, 0), (7.5, FILLET3_R))
        make_face()
    revolve(axis=Axis((100, 15, 48.5), (-1, 0, 0)), revolution_arc=90, mode=Mode.SUBTRACT)

    # Fillet4
    fillet4_edges = [part_1.edges().sort_by_distance(p)[0] for p in [
        (-97.803300859, 20.803300859, 58.196699141),
        (97.803300859, 20.803300859, 58.196699141),
        (-100, 20, 67),
        (-100, 23, 66.75),
        (100, 23, 66.75),
        (100, 20, 67),
    ]]
    fillet(fillet4_edges, radius=FILLET4_R - 0.0001)  # a hair under: the kernel refuses the full size


solid = part_1.part
